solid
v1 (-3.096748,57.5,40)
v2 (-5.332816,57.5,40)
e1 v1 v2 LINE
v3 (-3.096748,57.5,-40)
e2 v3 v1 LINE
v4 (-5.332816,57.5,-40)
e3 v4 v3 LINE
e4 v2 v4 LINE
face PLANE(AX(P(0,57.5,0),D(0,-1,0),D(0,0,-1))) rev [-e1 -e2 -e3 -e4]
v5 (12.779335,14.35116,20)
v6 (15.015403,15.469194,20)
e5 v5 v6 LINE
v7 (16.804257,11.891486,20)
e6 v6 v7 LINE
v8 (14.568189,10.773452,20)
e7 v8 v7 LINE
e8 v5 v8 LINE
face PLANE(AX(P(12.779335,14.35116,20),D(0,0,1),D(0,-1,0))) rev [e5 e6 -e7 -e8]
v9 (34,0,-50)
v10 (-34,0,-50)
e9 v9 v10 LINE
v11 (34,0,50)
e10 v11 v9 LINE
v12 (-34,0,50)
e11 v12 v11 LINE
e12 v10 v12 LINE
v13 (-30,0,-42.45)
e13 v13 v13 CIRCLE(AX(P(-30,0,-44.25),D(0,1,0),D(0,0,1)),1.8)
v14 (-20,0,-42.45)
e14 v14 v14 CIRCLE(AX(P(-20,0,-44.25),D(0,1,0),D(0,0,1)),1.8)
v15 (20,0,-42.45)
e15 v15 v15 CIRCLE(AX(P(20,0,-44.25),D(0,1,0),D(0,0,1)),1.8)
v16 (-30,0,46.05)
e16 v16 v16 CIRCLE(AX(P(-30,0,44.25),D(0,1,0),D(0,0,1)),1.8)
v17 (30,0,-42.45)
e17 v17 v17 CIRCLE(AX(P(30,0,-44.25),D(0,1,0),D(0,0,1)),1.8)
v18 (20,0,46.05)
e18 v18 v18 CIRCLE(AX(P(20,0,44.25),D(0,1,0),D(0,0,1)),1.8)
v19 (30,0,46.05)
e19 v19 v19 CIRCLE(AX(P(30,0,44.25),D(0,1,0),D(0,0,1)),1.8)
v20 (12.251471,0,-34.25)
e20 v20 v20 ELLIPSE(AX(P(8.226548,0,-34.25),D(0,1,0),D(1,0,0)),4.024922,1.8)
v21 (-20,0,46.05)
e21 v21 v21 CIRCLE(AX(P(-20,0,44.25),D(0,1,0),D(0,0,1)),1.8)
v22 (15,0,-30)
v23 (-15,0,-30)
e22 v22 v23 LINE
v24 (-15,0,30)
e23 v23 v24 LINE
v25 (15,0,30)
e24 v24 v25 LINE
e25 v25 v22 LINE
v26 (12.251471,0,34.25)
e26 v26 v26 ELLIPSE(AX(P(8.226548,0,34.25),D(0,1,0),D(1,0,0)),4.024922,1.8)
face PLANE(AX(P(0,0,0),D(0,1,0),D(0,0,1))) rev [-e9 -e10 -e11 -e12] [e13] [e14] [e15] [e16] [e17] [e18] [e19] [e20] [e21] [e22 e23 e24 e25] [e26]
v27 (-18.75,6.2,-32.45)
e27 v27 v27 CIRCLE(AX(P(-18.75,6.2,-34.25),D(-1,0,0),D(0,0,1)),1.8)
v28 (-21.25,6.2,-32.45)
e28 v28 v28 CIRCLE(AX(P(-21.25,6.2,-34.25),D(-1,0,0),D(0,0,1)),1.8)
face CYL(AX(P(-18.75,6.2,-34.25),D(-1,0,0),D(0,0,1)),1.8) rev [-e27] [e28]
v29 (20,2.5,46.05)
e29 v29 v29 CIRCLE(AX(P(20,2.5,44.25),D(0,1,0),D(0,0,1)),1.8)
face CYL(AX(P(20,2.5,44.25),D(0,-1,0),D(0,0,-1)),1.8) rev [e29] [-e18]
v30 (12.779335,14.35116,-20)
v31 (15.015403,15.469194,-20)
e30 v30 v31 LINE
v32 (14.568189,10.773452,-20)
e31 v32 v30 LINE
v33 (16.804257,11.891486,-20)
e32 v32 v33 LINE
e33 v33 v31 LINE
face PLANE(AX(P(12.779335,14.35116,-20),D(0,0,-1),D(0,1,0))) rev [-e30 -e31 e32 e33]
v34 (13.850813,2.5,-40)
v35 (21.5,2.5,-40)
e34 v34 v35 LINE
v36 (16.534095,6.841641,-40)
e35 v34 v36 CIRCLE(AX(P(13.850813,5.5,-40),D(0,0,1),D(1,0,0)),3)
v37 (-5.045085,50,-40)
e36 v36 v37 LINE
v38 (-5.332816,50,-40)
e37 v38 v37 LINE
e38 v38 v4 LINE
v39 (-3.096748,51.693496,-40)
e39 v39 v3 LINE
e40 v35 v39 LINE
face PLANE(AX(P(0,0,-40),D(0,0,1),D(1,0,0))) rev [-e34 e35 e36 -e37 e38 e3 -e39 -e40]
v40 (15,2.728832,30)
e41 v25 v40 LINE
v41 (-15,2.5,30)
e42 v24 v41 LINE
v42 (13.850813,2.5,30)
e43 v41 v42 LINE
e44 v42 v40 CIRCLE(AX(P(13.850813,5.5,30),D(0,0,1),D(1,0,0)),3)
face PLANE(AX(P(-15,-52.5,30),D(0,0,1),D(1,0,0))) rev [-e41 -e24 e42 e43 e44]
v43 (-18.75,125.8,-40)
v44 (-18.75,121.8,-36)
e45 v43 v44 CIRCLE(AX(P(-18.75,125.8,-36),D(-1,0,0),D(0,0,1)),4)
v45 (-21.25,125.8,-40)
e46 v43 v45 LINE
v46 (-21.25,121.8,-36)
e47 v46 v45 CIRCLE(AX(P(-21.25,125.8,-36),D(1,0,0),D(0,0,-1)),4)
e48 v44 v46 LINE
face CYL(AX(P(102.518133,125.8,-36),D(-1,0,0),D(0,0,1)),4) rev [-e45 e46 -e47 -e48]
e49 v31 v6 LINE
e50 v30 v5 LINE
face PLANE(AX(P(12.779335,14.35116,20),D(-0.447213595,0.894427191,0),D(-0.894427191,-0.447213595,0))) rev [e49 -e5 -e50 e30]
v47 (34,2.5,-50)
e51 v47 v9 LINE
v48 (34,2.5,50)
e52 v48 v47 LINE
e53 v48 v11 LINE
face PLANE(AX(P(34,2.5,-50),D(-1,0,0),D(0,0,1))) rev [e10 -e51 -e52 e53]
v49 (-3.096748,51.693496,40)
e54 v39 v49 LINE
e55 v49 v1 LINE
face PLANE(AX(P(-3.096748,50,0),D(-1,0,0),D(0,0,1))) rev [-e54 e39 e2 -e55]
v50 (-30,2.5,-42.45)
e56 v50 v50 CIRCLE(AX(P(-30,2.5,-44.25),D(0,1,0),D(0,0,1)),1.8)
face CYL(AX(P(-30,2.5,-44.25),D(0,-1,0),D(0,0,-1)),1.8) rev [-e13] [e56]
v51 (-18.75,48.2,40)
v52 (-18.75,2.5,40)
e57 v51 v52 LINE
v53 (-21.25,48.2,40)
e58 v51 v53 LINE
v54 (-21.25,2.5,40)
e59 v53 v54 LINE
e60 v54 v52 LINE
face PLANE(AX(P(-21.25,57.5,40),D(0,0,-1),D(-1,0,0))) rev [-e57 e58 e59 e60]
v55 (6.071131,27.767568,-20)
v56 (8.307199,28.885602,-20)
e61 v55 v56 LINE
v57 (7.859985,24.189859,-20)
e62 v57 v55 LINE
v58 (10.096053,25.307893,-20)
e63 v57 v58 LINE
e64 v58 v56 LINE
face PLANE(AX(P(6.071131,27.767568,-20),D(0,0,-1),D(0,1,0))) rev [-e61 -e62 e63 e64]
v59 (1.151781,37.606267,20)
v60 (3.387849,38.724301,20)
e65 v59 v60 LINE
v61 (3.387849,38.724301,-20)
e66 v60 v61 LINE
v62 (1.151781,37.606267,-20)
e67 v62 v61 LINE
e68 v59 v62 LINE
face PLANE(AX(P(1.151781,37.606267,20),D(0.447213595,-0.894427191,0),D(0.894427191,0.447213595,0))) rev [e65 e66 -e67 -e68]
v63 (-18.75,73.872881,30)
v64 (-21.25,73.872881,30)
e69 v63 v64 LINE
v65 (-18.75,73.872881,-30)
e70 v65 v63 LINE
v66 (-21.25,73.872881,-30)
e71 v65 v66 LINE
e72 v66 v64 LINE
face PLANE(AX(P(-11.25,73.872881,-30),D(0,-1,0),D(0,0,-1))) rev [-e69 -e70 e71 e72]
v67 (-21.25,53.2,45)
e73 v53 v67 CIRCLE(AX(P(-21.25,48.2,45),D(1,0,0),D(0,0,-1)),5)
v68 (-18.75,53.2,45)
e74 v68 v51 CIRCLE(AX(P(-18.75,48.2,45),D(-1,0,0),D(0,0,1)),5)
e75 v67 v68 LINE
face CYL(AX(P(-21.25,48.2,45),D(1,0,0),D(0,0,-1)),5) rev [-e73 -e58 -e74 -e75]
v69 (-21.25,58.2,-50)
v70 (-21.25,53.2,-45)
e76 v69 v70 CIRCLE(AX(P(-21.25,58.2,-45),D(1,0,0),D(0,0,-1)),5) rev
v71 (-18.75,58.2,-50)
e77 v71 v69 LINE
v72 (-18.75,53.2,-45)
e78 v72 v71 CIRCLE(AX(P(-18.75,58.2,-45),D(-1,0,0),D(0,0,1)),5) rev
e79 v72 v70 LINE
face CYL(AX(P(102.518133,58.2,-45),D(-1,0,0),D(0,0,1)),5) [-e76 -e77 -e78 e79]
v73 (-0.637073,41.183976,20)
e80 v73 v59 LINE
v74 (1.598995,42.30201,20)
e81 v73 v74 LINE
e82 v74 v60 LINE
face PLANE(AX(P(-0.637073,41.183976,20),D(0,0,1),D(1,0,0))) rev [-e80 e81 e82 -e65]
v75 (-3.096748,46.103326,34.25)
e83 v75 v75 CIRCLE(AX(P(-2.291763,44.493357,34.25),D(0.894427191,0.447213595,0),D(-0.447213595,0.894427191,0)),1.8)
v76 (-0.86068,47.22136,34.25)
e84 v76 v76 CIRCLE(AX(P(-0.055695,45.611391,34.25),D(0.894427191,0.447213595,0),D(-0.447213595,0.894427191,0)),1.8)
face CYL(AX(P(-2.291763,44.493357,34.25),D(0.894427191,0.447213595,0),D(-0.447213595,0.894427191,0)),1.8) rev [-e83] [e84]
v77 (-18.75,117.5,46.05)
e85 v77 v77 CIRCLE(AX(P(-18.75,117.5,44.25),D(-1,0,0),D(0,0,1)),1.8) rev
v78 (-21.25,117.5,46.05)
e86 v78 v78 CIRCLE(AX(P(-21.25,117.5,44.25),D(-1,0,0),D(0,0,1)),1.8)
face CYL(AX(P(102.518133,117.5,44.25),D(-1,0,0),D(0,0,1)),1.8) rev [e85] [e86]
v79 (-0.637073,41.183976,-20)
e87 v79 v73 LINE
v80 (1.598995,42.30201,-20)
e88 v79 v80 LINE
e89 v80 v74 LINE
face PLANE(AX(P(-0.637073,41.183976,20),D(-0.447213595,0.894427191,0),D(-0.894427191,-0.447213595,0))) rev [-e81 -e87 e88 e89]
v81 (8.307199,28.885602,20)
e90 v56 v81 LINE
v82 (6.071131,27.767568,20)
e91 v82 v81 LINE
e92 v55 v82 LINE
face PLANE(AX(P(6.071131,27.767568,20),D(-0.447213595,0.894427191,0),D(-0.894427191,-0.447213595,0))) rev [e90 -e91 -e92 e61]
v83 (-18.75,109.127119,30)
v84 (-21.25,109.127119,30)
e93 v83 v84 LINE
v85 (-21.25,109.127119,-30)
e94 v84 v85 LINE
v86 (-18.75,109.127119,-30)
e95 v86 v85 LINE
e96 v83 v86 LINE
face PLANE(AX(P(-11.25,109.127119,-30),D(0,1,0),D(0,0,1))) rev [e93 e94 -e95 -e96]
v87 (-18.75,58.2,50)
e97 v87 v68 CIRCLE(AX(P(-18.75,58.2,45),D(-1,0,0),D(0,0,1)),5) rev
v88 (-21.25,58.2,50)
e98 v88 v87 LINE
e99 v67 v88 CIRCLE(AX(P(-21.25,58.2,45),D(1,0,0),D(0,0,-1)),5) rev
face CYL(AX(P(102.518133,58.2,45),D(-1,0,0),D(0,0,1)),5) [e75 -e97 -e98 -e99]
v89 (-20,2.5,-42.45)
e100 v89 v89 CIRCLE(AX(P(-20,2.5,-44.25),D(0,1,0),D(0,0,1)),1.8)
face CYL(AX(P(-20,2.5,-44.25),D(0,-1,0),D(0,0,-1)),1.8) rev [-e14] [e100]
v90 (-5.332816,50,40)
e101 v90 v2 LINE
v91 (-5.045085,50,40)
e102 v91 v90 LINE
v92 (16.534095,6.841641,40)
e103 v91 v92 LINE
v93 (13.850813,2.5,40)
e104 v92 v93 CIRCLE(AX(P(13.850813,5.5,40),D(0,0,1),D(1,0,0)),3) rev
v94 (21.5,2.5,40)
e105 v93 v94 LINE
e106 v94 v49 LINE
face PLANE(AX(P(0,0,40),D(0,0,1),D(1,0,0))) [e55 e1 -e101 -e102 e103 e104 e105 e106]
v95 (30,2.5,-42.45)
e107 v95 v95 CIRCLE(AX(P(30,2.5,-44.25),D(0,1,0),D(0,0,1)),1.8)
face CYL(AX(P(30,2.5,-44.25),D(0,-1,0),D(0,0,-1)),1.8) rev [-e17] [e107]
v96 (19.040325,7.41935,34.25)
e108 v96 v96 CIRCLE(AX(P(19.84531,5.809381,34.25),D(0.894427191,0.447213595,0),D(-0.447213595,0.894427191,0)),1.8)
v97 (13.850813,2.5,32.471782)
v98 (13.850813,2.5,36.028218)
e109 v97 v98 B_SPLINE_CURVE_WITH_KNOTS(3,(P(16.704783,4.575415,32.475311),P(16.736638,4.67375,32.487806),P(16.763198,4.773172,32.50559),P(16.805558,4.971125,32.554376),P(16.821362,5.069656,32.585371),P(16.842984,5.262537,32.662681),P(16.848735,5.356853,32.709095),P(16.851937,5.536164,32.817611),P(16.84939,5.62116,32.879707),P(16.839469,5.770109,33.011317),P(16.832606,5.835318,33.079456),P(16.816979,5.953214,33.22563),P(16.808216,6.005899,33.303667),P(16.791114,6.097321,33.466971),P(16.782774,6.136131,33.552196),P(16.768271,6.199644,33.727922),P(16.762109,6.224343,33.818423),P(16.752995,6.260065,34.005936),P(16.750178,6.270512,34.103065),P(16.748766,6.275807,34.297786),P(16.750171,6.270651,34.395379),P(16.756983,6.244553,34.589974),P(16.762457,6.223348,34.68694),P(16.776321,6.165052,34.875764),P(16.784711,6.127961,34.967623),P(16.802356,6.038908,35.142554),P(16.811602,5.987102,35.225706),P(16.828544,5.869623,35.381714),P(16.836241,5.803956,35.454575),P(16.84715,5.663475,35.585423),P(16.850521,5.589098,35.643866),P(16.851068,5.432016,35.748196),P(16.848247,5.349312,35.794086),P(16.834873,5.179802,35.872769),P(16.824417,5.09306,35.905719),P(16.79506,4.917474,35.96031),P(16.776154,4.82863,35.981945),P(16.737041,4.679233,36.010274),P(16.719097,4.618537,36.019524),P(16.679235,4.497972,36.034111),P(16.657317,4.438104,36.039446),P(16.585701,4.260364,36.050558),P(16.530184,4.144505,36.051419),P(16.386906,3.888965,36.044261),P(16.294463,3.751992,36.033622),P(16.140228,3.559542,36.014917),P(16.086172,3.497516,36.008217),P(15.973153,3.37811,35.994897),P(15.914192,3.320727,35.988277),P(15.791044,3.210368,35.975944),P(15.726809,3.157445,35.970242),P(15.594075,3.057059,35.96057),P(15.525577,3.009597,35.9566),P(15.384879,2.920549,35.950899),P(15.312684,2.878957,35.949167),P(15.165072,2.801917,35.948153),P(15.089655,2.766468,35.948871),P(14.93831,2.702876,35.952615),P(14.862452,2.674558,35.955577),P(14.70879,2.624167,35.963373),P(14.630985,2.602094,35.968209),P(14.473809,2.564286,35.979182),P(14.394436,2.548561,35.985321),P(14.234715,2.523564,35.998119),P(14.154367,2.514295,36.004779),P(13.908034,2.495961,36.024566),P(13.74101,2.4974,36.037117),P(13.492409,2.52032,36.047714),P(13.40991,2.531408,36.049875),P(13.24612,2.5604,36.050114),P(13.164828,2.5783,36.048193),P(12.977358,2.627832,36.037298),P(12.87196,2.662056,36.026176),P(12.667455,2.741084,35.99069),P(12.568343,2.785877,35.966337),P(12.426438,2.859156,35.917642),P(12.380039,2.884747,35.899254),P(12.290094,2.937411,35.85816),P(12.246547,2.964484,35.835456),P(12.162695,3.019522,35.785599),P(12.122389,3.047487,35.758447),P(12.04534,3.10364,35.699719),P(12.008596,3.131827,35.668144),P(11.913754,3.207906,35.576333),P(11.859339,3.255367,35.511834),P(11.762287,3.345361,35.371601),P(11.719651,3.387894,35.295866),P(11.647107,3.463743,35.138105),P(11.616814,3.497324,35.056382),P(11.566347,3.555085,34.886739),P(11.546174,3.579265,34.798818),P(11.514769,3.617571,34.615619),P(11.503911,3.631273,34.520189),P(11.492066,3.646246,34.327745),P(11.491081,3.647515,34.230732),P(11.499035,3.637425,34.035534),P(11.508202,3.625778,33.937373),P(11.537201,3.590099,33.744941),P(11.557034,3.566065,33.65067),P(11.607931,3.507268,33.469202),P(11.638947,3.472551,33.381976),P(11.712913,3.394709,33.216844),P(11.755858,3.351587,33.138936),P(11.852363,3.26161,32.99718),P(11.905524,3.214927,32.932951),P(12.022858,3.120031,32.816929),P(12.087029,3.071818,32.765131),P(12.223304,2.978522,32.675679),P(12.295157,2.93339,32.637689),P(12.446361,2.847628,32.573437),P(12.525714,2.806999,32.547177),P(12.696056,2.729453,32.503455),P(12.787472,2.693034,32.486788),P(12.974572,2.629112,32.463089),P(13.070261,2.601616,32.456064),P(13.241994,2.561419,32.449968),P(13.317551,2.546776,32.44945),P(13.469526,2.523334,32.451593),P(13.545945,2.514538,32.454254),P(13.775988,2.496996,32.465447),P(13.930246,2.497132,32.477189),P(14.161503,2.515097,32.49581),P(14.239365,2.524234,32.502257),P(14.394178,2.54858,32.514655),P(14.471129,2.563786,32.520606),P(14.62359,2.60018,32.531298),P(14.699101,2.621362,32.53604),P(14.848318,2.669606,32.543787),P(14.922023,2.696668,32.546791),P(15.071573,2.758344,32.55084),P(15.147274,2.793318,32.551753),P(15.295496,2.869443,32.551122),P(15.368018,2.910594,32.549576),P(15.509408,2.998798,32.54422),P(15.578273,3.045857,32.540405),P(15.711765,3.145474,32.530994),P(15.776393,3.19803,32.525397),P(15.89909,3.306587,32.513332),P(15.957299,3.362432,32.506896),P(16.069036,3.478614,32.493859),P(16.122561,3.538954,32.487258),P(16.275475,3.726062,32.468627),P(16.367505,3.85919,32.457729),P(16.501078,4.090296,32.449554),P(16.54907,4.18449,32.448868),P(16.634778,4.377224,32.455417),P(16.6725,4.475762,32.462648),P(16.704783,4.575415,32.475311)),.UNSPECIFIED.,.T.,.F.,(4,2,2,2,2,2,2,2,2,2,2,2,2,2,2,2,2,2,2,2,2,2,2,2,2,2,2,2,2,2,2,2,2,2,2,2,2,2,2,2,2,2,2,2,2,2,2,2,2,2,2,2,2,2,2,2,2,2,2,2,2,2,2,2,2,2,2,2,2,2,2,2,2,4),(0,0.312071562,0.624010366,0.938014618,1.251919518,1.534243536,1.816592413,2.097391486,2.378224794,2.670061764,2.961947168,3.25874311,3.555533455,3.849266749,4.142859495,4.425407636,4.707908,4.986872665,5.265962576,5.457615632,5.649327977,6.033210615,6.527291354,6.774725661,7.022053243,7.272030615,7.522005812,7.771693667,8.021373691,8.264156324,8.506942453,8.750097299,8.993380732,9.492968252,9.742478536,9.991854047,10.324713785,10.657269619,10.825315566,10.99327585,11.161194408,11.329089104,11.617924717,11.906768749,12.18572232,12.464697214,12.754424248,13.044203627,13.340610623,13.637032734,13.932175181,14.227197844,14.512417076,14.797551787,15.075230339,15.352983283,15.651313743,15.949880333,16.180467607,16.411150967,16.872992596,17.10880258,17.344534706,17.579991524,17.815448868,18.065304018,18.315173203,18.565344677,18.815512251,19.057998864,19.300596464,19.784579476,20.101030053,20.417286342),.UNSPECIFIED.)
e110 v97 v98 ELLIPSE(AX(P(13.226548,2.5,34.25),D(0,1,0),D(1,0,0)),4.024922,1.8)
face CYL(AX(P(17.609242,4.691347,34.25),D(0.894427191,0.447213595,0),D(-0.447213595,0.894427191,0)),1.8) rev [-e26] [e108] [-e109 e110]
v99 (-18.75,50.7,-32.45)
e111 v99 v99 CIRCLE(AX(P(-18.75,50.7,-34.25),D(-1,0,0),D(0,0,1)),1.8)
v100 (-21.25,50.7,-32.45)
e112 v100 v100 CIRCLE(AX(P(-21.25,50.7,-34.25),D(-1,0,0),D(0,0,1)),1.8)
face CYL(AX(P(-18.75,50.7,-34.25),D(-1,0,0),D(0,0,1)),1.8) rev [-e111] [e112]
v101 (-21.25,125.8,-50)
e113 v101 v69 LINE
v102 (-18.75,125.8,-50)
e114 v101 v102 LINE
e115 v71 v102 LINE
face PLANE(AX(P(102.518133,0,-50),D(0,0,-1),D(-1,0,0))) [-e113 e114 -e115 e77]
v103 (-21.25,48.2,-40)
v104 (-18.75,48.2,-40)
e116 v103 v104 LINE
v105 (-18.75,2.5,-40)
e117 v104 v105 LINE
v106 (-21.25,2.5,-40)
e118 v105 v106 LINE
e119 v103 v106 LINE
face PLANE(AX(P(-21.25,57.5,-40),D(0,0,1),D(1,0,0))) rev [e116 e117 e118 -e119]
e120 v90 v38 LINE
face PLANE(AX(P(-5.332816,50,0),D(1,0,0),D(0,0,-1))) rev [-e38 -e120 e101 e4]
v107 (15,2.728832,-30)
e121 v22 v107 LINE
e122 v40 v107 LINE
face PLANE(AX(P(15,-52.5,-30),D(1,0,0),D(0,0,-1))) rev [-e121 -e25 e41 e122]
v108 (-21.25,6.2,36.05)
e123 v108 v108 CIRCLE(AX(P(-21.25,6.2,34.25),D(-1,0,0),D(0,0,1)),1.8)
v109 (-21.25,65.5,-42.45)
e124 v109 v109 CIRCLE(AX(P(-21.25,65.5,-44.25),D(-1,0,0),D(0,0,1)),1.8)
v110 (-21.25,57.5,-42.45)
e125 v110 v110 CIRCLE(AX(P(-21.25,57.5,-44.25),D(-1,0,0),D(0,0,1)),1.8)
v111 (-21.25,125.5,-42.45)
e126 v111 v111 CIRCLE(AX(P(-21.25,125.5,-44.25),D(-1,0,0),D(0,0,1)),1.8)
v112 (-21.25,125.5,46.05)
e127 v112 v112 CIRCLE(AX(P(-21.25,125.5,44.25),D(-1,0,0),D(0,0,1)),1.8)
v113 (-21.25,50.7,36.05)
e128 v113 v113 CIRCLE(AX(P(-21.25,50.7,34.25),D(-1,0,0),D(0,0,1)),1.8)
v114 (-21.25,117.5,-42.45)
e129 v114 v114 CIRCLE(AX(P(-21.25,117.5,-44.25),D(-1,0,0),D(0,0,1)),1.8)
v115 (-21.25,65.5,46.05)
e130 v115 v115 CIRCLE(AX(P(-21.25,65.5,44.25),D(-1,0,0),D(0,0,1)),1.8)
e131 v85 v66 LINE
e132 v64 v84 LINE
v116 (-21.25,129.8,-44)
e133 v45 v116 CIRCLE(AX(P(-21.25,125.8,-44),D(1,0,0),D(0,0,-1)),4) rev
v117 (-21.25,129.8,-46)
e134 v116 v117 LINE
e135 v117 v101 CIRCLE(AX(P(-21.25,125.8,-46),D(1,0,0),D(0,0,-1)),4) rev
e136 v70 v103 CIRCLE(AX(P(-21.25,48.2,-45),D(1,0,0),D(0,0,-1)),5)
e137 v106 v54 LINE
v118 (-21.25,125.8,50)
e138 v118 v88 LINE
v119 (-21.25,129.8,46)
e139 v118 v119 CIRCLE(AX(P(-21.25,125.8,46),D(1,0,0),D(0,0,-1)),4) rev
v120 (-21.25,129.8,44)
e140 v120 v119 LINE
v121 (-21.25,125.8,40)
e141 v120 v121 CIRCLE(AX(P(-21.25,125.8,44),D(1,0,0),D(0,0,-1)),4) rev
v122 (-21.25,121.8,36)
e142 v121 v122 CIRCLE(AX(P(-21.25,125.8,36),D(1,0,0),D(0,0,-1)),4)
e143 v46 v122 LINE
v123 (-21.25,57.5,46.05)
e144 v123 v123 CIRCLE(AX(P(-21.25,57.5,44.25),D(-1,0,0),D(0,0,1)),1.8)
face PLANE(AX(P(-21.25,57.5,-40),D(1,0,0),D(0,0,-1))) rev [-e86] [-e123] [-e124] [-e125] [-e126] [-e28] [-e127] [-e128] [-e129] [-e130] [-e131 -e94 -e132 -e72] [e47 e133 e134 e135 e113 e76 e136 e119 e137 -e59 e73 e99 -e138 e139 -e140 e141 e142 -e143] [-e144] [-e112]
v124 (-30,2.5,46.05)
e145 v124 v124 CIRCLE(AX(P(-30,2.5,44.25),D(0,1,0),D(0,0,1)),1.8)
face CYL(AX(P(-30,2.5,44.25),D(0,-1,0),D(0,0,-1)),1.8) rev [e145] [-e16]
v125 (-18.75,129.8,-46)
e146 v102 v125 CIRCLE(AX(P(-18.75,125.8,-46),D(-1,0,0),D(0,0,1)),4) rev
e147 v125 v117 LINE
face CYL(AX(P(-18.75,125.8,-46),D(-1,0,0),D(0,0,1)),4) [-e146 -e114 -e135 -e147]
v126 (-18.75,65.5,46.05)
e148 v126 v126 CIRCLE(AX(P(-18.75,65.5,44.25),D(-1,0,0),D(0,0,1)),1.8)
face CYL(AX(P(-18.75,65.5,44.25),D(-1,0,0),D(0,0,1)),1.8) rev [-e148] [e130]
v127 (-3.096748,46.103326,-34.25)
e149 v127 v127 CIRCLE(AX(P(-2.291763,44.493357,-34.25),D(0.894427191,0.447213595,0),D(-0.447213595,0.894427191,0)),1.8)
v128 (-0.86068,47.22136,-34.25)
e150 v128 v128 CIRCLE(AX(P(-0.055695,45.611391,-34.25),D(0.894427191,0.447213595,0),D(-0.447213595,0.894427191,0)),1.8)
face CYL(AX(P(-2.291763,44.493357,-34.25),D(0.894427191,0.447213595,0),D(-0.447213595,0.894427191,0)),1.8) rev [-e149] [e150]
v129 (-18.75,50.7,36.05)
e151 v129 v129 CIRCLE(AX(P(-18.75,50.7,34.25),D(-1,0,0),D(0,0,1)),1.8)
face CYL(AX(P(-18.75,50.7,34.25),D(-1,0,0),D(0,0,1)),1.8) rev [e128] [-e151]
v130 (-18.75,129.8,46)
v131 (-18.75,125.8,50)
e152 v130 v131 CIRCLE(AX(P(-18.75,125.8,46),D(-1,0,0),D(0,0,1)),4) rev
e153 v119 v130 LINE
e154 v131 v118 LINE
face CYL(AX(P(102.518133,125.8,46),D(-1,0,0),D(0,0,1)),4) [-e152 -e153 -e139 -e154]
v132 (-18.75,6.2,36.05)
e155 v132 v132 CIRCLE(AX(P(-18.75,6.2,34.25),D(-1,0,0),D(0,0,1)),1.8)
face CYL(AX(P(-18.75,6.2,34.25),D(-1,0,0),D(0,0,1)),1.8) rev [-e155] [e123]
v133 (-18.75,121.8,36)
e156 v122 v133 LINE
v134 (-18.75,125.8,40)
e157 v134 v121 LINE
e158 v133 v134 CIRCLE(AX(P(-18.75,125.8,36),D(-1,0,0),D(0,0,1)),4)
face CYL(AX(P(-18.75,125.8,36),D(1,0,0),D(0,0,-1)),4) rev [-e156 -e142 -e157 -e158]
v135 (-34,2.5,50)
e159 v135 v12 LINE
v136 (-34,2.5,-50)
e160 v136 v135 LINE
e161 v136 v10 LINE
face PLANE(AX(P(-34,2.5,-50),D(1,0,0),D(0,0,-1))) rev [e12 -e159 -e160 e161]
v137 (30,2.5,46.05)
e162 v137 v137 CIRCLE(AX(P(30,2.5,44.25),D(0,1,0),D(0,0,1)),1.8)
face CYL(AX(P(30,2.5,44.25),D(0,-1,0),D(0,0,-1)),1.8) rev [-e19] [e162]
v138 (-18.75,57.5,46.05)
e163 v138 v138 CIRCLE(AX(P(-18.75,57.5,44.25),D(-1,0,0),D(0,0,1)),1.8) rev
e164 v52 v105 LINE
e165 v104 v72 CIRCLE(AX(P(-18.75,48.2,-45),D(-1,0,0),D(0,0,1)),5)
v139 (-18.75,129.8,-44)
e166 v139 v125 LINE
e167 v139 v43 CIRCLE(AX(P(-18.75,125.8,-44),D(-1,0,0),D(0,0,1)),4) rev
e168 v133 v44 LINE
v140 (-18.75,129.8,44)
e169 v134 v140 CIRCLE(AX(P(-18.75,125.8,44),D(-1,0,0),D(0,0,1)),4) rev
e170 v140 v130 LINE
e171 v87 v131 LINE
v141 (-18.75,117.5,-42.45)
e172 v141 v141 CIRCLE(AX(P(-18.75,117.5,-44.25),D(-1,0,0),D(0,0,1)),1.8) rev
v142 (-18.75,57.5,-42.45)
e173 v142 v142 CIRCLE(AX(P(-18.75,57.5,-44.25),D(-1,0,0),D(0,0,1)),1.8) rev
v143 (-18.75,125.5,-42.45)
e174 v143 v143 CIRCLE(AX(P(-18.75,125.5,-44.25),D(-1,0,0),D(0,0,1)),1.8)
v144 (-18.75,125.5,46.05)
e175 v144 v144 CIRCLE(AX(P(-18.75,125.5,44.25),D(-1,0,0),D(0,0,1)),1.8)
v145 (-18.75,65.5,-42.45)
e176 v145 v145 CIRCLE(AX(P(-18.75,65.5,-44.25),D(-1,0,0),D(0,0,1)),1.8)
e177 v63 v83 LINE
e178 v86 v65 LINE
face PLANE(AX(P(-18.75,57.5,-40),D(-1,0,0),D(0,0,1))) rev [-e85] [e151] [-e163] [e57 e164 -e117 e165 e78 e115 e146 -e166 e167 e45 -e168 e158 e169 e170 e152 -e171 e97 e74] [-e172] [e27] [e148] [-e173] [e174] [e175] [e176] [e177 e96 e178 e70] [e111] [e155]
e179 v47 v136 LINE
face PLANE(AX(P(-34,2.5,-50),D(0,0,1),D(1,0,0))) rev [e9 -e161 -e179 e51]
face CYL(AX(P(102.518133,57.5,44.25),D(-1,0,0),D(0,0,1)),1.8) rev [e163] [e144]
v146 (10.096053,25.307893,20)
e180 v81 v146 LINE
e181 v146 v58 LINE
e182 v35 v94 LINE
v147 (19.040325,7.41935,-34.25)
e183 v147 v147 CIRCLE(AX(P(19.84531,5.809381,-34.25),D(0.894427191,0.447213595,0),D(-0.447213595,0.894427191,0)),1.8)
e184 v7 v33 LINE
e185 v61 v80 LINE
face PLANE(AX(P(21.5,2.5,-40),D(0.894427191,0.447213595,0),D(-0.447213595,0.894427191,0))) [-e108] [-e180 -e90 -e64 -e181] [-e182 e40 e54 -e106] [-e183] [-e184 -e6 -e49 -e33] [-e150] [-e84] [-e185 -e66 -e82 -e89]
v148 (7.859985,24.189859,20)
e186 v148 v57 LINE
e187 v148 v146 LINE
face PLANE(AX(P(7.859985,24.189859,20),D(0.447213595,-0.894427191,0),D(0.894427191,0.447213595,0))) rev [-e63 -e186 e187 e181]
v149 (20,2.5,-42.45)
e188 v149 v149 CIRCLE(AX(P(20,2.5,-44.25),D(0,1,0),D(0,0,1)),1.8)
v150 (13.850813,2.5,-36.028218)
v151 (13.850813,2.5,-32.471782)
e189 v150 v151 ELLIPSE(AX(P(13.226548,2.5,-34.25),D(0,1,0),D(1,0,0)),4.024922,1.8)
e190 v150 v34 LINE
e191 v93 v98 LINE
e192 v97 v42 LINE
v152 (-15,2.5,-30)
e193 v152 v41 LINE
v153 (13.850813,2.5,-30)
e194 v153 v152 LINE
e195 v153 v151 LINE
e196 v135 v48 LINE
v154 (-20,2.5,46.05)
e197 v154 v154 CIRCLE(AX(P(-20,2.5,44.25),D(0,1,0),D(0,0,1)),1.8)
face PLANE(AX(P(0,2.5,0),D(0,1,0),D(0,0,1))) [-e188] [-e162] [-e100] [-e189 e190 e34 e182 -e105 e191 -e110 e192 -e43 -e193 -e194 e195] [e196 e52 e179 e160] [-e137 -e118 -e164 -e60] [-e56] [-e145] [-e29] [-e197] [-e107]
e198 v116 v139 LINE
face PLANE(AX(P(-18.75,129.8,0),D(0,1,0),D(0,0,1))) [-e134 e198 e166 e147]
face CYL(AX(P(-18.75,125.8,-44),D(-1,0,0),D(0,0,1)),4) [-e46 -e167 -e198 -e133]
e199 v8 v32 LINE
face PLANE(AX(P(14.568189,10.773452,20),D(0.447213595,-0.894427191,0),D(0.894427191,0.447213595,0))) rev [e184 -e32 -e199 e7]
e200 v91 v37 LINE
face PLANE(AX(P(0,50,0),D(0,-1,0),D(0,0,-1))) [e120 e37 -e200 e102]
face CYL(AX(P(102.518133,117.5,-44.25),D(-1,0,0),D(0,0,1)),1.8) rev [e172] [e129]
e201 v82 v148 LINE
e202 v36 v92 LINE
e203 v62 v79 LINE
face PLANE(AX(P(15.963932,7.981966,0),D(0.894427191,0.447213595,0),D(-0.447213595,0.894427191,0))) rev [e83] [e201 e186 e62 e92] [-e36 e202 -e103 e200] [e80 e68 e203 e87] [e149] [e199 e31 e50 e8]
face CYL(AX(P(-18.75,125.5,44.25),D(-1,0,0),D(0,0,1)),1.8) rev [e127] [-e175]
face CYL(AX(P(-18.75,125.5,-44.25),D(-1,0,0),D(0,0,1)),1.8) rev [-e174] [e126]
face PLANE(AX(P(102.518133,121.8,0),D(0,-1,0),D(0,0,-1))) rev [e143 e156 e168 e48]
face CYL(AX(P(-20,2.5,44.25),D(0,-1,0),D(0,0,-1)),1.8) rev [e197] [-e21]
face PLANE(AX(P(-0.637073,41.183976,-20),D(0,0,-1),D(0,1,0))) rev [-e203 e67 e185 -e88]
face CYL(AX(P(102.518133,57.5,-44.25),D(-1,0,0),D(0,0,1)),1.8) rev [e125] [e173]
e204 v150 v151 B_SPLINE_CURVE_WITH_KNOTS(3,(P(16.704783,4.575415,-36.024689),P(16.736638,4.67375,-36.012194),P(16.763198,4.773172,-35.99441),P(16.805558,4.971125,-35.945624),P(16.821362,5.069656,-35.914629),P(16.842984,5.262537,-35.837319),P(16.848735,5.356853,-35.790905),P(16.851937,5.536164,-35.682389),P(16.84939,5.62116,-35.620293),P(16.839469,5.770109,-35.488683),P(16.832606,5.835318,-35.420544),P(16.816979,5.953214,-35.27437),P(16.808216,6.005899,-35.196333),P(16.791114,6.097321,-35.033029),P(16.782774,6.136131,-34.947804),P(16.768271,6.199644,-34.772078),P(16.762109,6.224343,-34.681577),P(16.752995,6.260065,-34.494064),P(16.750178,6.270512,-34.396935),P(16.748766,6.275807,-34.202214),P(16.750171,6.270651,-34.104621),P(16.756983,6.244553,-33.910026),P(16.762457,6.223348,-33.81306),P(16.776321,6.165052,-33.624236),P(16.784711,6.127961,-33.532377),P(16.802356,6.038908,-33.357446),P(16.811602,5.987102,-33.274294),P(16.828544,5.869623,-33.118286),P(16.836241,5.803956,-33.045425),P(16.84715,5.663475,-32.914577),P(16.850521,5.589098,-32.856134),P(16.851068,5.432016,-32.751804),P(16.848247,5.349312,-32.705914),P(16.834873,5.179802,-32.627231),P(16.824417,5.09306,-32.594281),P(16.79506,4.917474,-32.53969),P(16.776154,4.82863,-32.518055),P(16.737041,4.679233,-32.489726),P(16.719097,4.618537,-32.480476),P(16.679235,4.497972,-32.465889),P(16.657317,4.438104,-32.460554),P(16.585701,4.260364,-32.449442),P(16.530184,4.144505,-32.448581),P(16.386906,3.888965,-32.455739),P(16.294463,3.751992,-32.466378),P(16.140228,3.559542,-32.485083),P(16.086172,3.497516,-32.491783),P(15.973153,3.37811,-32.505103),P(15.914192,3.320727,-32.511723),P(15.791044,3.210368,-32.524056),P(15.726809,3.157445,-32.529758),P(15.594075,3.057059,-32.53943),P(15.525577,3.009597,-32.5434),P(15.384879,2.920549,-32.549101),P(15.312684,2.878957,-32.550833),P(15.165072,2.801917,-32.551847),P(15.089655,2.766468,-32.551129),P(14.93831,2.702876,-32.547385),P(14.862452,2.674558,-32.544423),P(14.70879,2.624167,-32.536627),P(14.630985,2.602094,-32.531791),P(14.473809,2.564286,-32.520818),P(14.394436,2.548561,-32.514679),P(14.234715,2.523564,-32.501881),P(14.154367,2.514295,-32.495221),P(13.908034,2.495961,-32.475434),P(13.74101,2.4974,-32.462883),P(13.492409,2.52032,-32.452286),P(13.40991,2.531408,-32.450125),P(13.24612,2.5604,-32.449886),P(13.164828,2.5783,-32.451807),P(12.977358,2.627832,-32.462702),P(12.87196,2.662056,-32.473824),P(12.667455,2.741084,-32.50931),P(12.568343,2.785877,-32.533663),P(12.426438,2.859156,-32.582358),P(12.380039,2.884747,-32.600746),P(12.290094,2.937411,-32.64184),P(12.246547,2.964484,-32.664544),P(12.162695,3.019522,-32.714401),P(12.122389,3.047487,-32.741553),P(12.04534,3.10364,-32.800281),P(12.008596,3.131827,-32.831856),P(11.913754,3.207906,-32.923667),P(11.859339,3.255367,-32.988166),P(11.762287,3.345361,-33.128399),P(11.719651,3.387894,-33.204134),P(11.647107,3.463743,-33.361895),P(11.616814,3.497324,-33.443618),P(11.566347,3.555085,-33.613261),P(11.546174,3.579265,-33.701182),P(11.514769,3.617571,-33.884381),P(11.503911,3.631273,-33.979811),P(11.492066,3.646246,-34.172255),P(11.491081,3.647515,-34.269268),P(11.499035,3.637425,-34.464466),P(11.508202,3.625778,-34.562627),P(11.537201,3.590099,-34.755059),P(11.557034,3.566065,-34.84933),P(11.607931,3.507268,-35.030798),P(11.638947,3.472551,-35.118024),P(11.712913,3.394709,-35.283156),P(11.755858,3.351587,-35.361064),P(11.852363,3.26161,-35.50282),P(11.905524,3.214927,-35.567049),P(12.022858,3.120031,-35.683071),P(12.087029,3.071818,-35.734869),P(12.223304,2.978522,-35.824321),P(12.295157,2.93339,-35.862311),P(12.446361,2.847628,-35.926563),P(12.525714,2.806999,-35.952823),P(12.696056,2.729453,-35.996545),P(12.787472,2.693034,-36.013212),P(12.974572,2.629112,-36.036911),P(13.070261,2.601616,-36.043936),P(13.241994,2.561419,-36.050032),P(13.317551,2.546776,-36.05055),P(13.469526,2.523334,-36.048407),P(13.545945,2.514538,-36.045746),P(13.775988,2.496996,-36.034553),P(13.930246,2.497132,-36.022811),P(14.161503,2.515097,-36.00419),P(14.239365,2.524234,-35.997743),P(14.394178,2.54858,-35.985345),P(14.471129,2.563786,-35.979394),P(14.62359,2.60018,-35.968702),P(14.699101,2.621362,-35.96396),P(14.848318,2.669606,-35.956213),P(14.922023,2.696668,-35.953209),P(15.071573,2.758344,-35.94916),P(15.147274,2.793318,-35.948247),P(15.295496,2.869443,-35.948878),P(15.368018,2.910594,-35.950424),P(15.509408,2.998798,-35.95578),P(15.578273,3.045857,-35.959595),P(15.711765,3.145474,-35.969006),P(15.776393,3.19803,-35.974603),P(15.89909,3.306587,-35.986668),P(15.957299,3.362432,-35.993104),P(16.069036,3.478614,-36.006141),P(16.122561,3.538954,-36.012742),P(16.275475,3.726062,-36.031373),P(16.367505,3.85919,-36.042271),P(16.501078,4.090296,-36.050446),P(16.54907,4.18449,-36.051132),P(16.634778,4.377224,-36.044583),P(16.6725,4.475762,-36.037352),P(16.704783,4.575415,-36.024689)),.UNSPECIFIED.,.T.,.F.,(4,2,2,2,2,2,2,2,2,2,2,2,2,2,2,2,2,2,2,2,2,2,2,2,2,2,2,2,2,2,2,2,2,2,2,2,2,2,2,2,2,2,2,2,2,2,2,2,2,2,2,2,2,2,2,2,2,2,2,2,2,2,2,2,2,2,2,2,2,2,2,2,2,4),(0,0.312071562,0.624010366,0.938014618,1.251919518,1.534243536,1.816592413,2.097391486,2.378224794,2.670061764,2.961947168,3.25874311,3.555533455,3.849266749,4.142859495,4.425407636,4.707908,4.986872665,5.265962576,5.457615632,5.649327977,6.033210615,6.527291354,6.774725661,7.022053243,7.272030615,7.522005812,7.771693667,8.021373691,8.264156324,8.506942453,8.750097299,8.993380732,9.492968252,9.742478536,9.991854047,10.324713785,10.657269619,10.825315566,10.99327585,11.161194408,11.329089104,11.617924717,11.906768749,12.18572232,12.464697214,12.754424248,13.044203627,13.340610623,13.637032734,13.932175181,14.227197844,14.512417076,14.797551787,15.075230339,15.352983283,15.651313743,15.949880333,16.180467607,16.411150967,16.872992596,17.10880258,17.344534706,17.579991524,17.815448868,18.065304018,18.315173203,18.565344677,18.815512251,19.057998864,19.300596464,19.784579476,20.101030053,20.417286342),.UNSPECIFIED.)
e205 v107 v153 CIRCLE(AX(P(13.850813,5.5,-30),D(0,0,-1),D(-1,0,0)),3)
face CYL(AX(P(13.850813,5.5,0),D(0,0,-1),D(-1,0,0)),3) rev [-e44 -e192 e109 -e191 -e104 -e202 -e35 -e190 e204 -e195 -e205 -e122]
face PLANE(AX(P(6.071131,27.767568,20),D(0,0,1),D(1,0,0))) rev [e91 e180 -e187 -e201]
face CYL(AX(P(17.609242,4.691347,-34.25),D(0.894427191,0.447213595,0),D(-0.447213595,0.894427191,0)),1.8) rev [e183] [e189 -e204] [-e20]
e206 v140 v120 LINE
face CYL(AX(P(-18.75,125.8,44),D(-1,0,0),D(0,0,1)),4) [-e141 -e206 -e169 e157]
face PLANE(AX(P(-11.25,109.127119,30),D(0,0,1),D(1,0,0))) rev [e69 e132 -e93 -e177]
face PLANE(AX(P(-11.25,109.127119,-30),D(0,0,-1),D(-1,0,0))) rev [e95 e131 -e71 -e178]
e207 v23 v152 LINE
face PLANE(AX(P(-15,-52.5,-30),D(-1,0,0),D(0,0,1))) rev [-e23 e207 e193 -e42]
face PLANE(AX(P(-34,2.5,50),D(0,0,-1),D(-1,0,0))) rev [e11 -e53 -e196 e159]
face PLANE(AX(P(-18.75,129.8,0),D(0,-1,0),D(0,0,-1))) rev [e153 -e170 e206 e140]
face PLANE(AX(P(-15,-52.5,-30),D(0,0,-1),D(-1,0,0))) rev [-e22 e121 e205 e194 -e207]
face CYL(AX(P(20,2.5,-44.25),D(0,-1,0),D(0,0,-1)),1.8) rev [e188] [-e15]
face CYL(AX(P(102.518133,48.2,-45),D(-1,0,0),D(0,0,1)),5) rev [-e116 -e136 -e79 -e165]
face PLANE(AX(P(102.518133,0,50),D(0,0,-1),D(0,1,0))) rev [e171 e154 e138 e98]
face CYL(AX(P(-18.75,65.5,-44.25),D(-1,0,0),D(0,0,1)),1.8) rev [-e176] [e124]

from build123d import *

# Parameters (mm, degrees)
SKETCH_1_W           = 68
SKETCH_1_H           = 100
SKETCH_1_R           = 1.8
EXTRUDE_1_DEPTH      = 2.5
SKETCH_3_W           = 2.5
SKETCH_3_H           = 80
EXTRUDE_2_DEPTH      = 55
SKETCH_4_W           = 30
SKETCH_4_H           = 60
CUT_EXTRUDE_1_DEPTH  = 55
EXTRUDE_3_DEPTH      = 40
EXTRUDE_3_DEPTH_BACK = 40
SKETCH_5_W           = 80
SKETCH_5_H           = 55
EXTRUDE_5_DEPTH      = 2.5
SKETCH_6_R           = 1.8
CUT_EXTRUDE_2_DEPTH  = 2.5
SKETCH_7_R           = 1.8
CUT_EXTRUDE_3_DEPTH  = 2.5
EXTRUDE_START        = 55
SKETCH_8_W           = 2.236067978
SKETCH_8_H           = 80
EXTRUDE_6_DEPTH      = 7.5
SKETCH_10_R          = 1.8
SKETCH_10_W          = 80
SKETCH_10_H          = 3
SKETCH_10_W_2        = 10
SKETCH_10_H_2        = 1.3
SKETCH_10_W_3        = 100
EXTRUDE_7_DEPTH      = 2.5
FILLET_1_R           = 5
FILLET_4_R           = 3
SKETCH_11_R          = 1.8
CUT_EXTRUDE_4_DEPTH  = 30
SKETCH_13_W          = 40
SKETCH_13_H          = 4
CUT_EXTRUDE_5_DEPTH  = 2.5
SKETCH_14_R          = 1.8
CUT_EXTRUDE_6_DEPTH  = 2.5
SKETCH_15_R          = 1.8
EXTRUDE_10_DEPTH     = 2.5
FILLET_6_R           = 4
SKETCH_16_W          = 60
SKETCH_16_H          = 35.254237288
CUT_EXTRUDE_8_DEPTH  = 10


# Some blends are built 0.0001 mm under size
with BuildPart() as part:
    # 草图1 → 凸台-拉伸1 (new body)
    with BuildSketch(Plane(origin=(0, 0, 0), x_dir=(1, 0, 0), z_dir=(0, 1, 0))):
        Rectangle(SKETCH_1_W, SKETCH_1_H)
        with Locations(Location((-30, 44.25, 0), (0, 0, 270))):
            Circle(SKETCH_1_R, mode=Mode.SUBTRACT)
        with Locations(Location((30, 44.25, 0), (0, 0, 270))):
            Circle(SKETCH_1_R, mode=Mode.SUBTRACT)
        with Locations(Location((30, -44.25, 0), (0, 0, 270))):
            Circle(SKETCH_1_R, mode=Mode.SUBTRACT)
        with Locations(Location((-30, -44.25, 0), (0, 0, 270))):
            Circle(SKETCH_1_R, mode=Mode.SUBTRACT)
        with Locations(Location((20, -44.25, 0), (0, 0, 270))):
            Circle(SKETCH_1_R, mode=Mode.SUBTRACT)
        with Locations(Location((20, 44.25, 0), (0, 0, 270))):
            Circle(SKETCH_1_R, mode=Mode.SUBTRACT)
        with Locations(Location((-20, -44.25, 0), (0, 0, 270))):
            Circle(SKETCH_1_R, mode=Mode.SUBTRACT)
        with Locations(Location((-20, 44.25, 0), (0, 0, 270))):
            Circle(SKETCH_1_R, mode=Mode.SUBTRACT)
    extrude(amount=EXTRUDE_1_DEPTH)

    # 草图3 → 凸台-拉伸2 (add)
    with BuildSketch(Plane(origin=(0, 2.5, 0), x_dir=(1, 0, 0), z_dir=(0, 1, 0))):
        with Locations((-20, 0)):
            Rectangle(SKETCH_3_W, SKETCH_3_H)
    extrude(amount=EXTRUDE_2_DEPTH)

    # 草图4 → 切除-拉伸1 (cut)
    with BuildSketch(Plane(origin=(0, 2.5, 0), x_dir=(1, 0, 0), z_dir=(0, 1, 0))):
        Rectangle(SKETCH_4_W, SKETCH_4_H)
    extrude(amount=-CUT_EXTRUDE_1_DEPTH, mode=Mode.SUBTRACT)

    # 草图2 → 凸台-拉伸3 (add, two sides: drawn at the far end of the back side and taken through both)
    with BuildSketch(Plane.XY.offset(-EXTRUDE_3_DEPTH_BACK)):
        Polygon((20, 2.5), (21.5, 2.5), (20, 5.5), align=None)
    extrude(amount=EXTRUDE_3_DEPTH + EXTRUDE_3_DEPTH_BACK)

    # 草图5 → 凸台-拉伸5 (add)
    with BuildSketch(Plane(origin=(18.2, 9.1, 0), x_dir=(0, 0, -1), z_dir=(0.8944271909999156, 0.44721359549995837, 0))):
        with Locations((0, 20.120975674)):
            Rectangle(SKETCH_5_W, SKETCH_5_H)
    extrude(amount=-EXTRUDE_5_DEPTH)

    # 草图6 → 切除-拉伸2 (cut)
    with BuildSketch(Plane.ZY.offset(21.25)):
        with Locations((34.25, 50.7)):
            Circle(SKETCH_6_R)
        with Locations((34.25, 6.2)):
            Circle(SKETCH_6_R)
        with Locations((-34.25, 50.7)):
            Circle(SKETCH_6_R)
        with Locations((-34.25, 6.2)):
            Circle(SKETCH_6_R)
    extrude(amount=-CUT_EXTRUDE_2_DEPTH, mode=Mode.SUBTRACT)

    # 草图7 → 切除-拉伸3 (cut)
    with BuildSketch(Plane(origin=(18.2, 9.1, 0), x_dir=(0, 0, -1), z_dir=(0.8944271909999156, 0.44721359549995837, 0))):
        with Locations(Location((34.25, 40.820975674, 0), (0, 0, 90))):
            Circle(SKETCH_7_R)
        with Locations(Location((-34.25, 40.820975674, 0), (0, 0, 90))):
            Circle(SKETCH_7_R)
        with Locations(Location((-34.25, -3.679024326, 0), (0, 0, 90))):
            Circle(SKETCH_7_R)
        with Locations(Location((34.25, -3.679024326, 0), (0, 0, 90))):
            Circle(SKETCH_7_R)
    extrude(amount=-CUT_EXTRUDE_3_DEPTH, mode=Mode.SUBTRACT)

    # 草图8 → 凸台-拉伸6 (add)
    with BuildSketch(Plane(origin=(0, 2.5, 0), x_dir=(1, 0, 0), z_dir=(0, 1, 0)).offset(EXTRUDE_START)):
        with Locations((-4.214781741, 0)):
            Rectangle(SKETCH_8_W, SKETCH_8_H)
    extrude(amount=-EXTRUDE_6_DEPTH)

    # 草图10 → 凸台-拉伸7 (add)
    # profile 1 of 5: a face of its own
    with BuildSketch(Plane.ZY.offset(21.25)):
        Polygon((50, 120.5), (-50, 120.5), (-50, 54.5), (-40, 54.5), (-40, 57.5), (40, 57.5), (40, 54.5), (50, 54.5), align=None)
        with Locations((-44.25, 57.5)):
            Circle(SKETCH_10_R, mode=Mode.SUBTRACT)
        with Locations((44.25, 57.5)):
            Circle(SKETCH_10_R, mode=Mode.SUBTRACT)
        with Locations((-44.25, 117.5)):
            Circle(SKETCH_10_R, mode=Mode.SUBTRACT)
        with Locations((44.25, 117.5)):
            Circle(SKETCH_10_R, mode=Mode.SUBTRACT)
    # profile 2 of 5: a face of its own
    with BuildSketch(Plane.ZY.offset(21.25)):
        with Locations((0, 56)):
            Rectangle(SKETCH_10_W, SKETCH_10_H)
    # profile 3 of 5: a face of its own
    with BuildSketch(Plane.ZY.offset(21.25)):
        with Locations((-45, 53.85)):
            Rectangle(SKETCH_10_W_2, SKETCH_10_H_2)
    # profile 4 of 5: a face of its own
    with BuildSketch(Plane.ZY.offset(21.25)):
        with Locations((45, 53.85)):
            Rectangle(SKETCH_10_W_2, SKETCH_10_H_2)
    # profile 5 of 5: a face of its own
    with BuildSketch(Plane.ZY.offset(21.25)):
        with Locations((0, 121.15)):
            Rectangle(SKETCH_10_W_3, SKETCH_10_H_2)
    extrude(amount=-EXTRUDE_7_DEPTH)

    # 圆角1
    fillet_1_edges = [part.edges().sort_by_distance(p)[0] for p in [
        (-20, 121.8, -50),
        (-20, 121.8, 50),
        (-20, 53.2, 50),
        (-20, 53.2, -50),
        (-20, 53.2, -40),
        (-20, 53.2, 40),
    ]]
    fillet(fillet_1_edges, radius=FILLET_1_R - 0.0001)  # a hair under: the kernel refuses the full size

    # 圆角4
    # the kernel refuses this fillet: 3 mm, written as the material it adds along each edge
    with BuildSketch(Plane(origin=(18.704915028, 2.5, 40), x_dir=(-1, 0, 0), z_dir=(0, 0, -1))) as fillet_4_piece_1_section:
        with BuildLine():
            CenterArc((FILLET_4_R * 1.61803398875, FILLET_4_R), FILLET_4_R, 153.434948823, 116.565051177)
            Line((FILLET_4_R * 0.72360679775, FILLET_4_R * 1.4472135955), (0, 0))
            Line((0, 0), (FILLET_4_R * 1.61803398875, 0))
        make_face()
    fillet_4_piece_1 = extrude(amount=92.135254916, mode=Mode.PRIVATE)
    fillet_4_piece_1 = split(fillet_4_piece_1, bisect_by=Plane(origin=(14.716283271, 2.568197863, 30), z_dir=(0, 0, 1)), keep=Keep.TOP, mode=Mode.PRIVATE)
    fillet_4_piece_1 = fillet_4_piece_1 - Plane(origin=(14.445615458, 3.109533488, 34.25), x_dir=(-0.44721359549995837, 0.8944271909999156, 0), z_dir=(0.8944271909999156, 0.44721359549995837, 0)) * Cylinder(1.8, 204, mode=Mode.PRIVATE)
    add(fillet_4_piece_1)
    with BuildSketch(Plane(origin=(18.704915028, 2.5, 52.135254916), x_dir=(-1, 0, 0), z_dir=(0, 0, -1))) as fillet_4_piece_2_section:
        with BuildLine():
            CenterArc((FILLET_4_R * 1.61803398875, FILLET_4_R), FILLET_4_R, 153.434948823, 116.565051177)
            Line((FILLET_4_R * 0.72360679775, FILLET_4_R * 1.4472135955), (0, 0))
            Line((0, 0), (FILLET_4_R * 1.61803398875, 0))
        make_face()
    fillet_4_piece_2 = extrude(amount=92.135254916, mode=Mode.PRIVATE)
    fillet_4_piece_2 = split(fillet_4_piece_2, bisect_by=Plane(origin=(17.041037704, 3.56720979, 30), z_dir=(0, 0, -1)), keep=Keep.TOP, mode=Mode.PRIVATE)
    fillet_4_piece_2 = split(fillet_4_piece_2, bisect_by=Plane(origin=(15, 3.56720979, 0), z_dir=(1, 0, 0)), keep=Keep.TOP, mode=Mode.PRIVATE)
    fillet_4_piece_2 = fillet_4_piece_2 - Plane(origin=(16.705023776, 4.239237646, -34.25), x_dir=(-0.44721359549995837, 0.8944271909999156, 0), z_dir=(0.8944271909999156, 0.44721359549995837, 0)) * Cylinder(1.8, 204, mode=Mode.PRIVATE)
    add(fillet_4_piece_2)
    with BuildSketch(Plane(origin=(18.704915028, 2.5, 52.135254916), x_dir=(-1, 0, 0), z_dir=(0, 0, -1))) as fillet_4_piece_3_section:
        with BuildLine():
            CenterArc((FILLET_4_R * 1.61803398875, FILLET_4_R), FILLET_4_R, 153.434948823, 116.565051177)
            Line((FILLET_4_R * 0.72360679775, FILLET_4_R * 1.4472135955), (0, 0))
            Line((0, 0), (FILLET_4_R * 1.61803398875, 0))
        make_face()
    fillet_4_piece_3 = extrude(amount=92.135254916, mode=Mode.PRIVATE)
    fillet_4_piece_3 = split(fillet_4_piece_3, bisect_by=Plane(origin=(14.716283305, 2.568197867, -30), z_dir=(0, 0, -1)), keep=Keep.TOP, mode=Mode.PRIVATE)
    fillet_4_piece_3 = fillet_4_piece_3 - Plane(origin=(14.445615487, 3.109533502, -34.25), x_dir=(-0.44721359549995837, 0.8944271909999156, 0), z_dir=(0.8944271909999156, 0.44721359549995837, 0)) * Cylinder(1.8, 204, mode=Mode.PRIVATE)
    add(fillet_4_piece_3)

    # 草图11 → 切除-拉伸4 (cut)
    with BuildSketch(Plane(origin=(18.2, 9.1, 0), x_dir=(0, 0, -1), z_dir=(0.8944271909999156, 0.44721359549995837, 0))):
        with Locations(Location((-34.25, -3.679024326, 0), (0, 0, 90))):
            Circle(SKETCH_11_R)
        with Locations(Location((34.25, -3.679024326, 0), (0, 0, 90))):
            Circle(SKETCH_11_R)
    extrude(amount=-CUT_EXTRUDE_4_DEPTH, mode=Mode.SUBTRACT)

    # 草图13 → 切除-拉伸5 (cut)
    with BuildSketch(Plane(origin=(18.2, 9.1, 0), x_dir=(0, 0, -1), z_dir=(0.8944271909999156, 0.44721359549995837, 0))):
        with Locations((0, 20.120975674)):
            Rectangle(SKETCH_13_W, SKETCH_13_H)
        with Locations((0, 35.120975674)):
            Rectangle(SKETCH_13_W, SKETCH_13_H)
        with Locations((0, 5.120975674)):
            Rectangle(SKETCH_13_W, SKETCH_13_H)
    extrude(amount=-CUT_EXTRUDE_5_DEPTH, mode=Mode.SUBTRACT)

    # 草图14 → 切除-拉伸6 (cut)
    with BuildSketch(Plane.ZY.offset(21.25)):
        with Locations((-44.25, 65.5)):
            Circle(SKETCH_14_R)
        with Locations((44.25, 65.5)):
            Circle(SKETCH_14_R)
    extrude(amount=-CUT_EXTRUDE_6_DEPTH, mode=Mode.SUBTRACT)

    # 草图15 → 凸台-拉伸10 (add)
    # profile 1 of 4: a face of its own
    with BuildSketch(Plane.ZY.offset(21.25)):
        Polygon((-42.960162103, 121.8), (-40, 121.8), (-40, 129.8), (-50, 129.8), (-50, 121.8), (-45, 121.8), align=None)
        with Locations((-44.25, 125.5)):
            Circle(SKETCH_15_R, mode=Mode.SUBTRACT)
    # profile 2 of 4: a face of its own
    with BuildSketch(Plane.ZY.offset(21.25)):
        Polygon((40, 129.8), (40, 121.8), (44.25, 121.8), (45, 121.8), (50, 121.8), (50, 129.8), align=None)
        with Locations((44.25, 125.5)):
            Circle(SKETCH_15_R, mode=Mode.SUBTRACT)
    # profile 3 of 4: a face of its own
    with BuildSketch(Plane.ZY.offset(21.25)):
        Polygon((-50, 114.760162103), (-42.960162103, 121.8), (-45, 121.8), (-50, 121.8), align=None)
    # profile 4 of 4: a face of its own
    with BuildSketch(Plane.ZY.offset(21.25)):
        Polygon((45, 121.8), (44.25, 121.8), (50, 115.456159587), (50, 121.8), align=None)
    extrude(amount=-EXTRUDE_10_DEPTH)

    # 圆角6
    fillet_6_edges = [part.edges().sort_by_distance(p)[0] for p in [
        (-20, 121.8, 40),
        (-20, 129.8, 40),
        (-20, 129.8, 50),
        (-20, 129.8, -50),
        (-20, 129.8, -40),
        (-20, 121.8, -40),
    ]]
    fillet(fillet_6_edges, radius=FILLET_6_R - 0.0001)  # a hair under: the kernel refuses the full size

    # 草图16 → 切除-拉伸8 (cut)
    with BuildSketch(Plane.ZY.offset(21.25)):
        with Locations((0, 91.5)):
            Rectangle(SKETCH_16_W, SKETCH_16_H)
    extrude(amount=-CUT_EXTRUDE_8_DEPTH, mode=Mode.SUBTRACT)


solid = part.part
